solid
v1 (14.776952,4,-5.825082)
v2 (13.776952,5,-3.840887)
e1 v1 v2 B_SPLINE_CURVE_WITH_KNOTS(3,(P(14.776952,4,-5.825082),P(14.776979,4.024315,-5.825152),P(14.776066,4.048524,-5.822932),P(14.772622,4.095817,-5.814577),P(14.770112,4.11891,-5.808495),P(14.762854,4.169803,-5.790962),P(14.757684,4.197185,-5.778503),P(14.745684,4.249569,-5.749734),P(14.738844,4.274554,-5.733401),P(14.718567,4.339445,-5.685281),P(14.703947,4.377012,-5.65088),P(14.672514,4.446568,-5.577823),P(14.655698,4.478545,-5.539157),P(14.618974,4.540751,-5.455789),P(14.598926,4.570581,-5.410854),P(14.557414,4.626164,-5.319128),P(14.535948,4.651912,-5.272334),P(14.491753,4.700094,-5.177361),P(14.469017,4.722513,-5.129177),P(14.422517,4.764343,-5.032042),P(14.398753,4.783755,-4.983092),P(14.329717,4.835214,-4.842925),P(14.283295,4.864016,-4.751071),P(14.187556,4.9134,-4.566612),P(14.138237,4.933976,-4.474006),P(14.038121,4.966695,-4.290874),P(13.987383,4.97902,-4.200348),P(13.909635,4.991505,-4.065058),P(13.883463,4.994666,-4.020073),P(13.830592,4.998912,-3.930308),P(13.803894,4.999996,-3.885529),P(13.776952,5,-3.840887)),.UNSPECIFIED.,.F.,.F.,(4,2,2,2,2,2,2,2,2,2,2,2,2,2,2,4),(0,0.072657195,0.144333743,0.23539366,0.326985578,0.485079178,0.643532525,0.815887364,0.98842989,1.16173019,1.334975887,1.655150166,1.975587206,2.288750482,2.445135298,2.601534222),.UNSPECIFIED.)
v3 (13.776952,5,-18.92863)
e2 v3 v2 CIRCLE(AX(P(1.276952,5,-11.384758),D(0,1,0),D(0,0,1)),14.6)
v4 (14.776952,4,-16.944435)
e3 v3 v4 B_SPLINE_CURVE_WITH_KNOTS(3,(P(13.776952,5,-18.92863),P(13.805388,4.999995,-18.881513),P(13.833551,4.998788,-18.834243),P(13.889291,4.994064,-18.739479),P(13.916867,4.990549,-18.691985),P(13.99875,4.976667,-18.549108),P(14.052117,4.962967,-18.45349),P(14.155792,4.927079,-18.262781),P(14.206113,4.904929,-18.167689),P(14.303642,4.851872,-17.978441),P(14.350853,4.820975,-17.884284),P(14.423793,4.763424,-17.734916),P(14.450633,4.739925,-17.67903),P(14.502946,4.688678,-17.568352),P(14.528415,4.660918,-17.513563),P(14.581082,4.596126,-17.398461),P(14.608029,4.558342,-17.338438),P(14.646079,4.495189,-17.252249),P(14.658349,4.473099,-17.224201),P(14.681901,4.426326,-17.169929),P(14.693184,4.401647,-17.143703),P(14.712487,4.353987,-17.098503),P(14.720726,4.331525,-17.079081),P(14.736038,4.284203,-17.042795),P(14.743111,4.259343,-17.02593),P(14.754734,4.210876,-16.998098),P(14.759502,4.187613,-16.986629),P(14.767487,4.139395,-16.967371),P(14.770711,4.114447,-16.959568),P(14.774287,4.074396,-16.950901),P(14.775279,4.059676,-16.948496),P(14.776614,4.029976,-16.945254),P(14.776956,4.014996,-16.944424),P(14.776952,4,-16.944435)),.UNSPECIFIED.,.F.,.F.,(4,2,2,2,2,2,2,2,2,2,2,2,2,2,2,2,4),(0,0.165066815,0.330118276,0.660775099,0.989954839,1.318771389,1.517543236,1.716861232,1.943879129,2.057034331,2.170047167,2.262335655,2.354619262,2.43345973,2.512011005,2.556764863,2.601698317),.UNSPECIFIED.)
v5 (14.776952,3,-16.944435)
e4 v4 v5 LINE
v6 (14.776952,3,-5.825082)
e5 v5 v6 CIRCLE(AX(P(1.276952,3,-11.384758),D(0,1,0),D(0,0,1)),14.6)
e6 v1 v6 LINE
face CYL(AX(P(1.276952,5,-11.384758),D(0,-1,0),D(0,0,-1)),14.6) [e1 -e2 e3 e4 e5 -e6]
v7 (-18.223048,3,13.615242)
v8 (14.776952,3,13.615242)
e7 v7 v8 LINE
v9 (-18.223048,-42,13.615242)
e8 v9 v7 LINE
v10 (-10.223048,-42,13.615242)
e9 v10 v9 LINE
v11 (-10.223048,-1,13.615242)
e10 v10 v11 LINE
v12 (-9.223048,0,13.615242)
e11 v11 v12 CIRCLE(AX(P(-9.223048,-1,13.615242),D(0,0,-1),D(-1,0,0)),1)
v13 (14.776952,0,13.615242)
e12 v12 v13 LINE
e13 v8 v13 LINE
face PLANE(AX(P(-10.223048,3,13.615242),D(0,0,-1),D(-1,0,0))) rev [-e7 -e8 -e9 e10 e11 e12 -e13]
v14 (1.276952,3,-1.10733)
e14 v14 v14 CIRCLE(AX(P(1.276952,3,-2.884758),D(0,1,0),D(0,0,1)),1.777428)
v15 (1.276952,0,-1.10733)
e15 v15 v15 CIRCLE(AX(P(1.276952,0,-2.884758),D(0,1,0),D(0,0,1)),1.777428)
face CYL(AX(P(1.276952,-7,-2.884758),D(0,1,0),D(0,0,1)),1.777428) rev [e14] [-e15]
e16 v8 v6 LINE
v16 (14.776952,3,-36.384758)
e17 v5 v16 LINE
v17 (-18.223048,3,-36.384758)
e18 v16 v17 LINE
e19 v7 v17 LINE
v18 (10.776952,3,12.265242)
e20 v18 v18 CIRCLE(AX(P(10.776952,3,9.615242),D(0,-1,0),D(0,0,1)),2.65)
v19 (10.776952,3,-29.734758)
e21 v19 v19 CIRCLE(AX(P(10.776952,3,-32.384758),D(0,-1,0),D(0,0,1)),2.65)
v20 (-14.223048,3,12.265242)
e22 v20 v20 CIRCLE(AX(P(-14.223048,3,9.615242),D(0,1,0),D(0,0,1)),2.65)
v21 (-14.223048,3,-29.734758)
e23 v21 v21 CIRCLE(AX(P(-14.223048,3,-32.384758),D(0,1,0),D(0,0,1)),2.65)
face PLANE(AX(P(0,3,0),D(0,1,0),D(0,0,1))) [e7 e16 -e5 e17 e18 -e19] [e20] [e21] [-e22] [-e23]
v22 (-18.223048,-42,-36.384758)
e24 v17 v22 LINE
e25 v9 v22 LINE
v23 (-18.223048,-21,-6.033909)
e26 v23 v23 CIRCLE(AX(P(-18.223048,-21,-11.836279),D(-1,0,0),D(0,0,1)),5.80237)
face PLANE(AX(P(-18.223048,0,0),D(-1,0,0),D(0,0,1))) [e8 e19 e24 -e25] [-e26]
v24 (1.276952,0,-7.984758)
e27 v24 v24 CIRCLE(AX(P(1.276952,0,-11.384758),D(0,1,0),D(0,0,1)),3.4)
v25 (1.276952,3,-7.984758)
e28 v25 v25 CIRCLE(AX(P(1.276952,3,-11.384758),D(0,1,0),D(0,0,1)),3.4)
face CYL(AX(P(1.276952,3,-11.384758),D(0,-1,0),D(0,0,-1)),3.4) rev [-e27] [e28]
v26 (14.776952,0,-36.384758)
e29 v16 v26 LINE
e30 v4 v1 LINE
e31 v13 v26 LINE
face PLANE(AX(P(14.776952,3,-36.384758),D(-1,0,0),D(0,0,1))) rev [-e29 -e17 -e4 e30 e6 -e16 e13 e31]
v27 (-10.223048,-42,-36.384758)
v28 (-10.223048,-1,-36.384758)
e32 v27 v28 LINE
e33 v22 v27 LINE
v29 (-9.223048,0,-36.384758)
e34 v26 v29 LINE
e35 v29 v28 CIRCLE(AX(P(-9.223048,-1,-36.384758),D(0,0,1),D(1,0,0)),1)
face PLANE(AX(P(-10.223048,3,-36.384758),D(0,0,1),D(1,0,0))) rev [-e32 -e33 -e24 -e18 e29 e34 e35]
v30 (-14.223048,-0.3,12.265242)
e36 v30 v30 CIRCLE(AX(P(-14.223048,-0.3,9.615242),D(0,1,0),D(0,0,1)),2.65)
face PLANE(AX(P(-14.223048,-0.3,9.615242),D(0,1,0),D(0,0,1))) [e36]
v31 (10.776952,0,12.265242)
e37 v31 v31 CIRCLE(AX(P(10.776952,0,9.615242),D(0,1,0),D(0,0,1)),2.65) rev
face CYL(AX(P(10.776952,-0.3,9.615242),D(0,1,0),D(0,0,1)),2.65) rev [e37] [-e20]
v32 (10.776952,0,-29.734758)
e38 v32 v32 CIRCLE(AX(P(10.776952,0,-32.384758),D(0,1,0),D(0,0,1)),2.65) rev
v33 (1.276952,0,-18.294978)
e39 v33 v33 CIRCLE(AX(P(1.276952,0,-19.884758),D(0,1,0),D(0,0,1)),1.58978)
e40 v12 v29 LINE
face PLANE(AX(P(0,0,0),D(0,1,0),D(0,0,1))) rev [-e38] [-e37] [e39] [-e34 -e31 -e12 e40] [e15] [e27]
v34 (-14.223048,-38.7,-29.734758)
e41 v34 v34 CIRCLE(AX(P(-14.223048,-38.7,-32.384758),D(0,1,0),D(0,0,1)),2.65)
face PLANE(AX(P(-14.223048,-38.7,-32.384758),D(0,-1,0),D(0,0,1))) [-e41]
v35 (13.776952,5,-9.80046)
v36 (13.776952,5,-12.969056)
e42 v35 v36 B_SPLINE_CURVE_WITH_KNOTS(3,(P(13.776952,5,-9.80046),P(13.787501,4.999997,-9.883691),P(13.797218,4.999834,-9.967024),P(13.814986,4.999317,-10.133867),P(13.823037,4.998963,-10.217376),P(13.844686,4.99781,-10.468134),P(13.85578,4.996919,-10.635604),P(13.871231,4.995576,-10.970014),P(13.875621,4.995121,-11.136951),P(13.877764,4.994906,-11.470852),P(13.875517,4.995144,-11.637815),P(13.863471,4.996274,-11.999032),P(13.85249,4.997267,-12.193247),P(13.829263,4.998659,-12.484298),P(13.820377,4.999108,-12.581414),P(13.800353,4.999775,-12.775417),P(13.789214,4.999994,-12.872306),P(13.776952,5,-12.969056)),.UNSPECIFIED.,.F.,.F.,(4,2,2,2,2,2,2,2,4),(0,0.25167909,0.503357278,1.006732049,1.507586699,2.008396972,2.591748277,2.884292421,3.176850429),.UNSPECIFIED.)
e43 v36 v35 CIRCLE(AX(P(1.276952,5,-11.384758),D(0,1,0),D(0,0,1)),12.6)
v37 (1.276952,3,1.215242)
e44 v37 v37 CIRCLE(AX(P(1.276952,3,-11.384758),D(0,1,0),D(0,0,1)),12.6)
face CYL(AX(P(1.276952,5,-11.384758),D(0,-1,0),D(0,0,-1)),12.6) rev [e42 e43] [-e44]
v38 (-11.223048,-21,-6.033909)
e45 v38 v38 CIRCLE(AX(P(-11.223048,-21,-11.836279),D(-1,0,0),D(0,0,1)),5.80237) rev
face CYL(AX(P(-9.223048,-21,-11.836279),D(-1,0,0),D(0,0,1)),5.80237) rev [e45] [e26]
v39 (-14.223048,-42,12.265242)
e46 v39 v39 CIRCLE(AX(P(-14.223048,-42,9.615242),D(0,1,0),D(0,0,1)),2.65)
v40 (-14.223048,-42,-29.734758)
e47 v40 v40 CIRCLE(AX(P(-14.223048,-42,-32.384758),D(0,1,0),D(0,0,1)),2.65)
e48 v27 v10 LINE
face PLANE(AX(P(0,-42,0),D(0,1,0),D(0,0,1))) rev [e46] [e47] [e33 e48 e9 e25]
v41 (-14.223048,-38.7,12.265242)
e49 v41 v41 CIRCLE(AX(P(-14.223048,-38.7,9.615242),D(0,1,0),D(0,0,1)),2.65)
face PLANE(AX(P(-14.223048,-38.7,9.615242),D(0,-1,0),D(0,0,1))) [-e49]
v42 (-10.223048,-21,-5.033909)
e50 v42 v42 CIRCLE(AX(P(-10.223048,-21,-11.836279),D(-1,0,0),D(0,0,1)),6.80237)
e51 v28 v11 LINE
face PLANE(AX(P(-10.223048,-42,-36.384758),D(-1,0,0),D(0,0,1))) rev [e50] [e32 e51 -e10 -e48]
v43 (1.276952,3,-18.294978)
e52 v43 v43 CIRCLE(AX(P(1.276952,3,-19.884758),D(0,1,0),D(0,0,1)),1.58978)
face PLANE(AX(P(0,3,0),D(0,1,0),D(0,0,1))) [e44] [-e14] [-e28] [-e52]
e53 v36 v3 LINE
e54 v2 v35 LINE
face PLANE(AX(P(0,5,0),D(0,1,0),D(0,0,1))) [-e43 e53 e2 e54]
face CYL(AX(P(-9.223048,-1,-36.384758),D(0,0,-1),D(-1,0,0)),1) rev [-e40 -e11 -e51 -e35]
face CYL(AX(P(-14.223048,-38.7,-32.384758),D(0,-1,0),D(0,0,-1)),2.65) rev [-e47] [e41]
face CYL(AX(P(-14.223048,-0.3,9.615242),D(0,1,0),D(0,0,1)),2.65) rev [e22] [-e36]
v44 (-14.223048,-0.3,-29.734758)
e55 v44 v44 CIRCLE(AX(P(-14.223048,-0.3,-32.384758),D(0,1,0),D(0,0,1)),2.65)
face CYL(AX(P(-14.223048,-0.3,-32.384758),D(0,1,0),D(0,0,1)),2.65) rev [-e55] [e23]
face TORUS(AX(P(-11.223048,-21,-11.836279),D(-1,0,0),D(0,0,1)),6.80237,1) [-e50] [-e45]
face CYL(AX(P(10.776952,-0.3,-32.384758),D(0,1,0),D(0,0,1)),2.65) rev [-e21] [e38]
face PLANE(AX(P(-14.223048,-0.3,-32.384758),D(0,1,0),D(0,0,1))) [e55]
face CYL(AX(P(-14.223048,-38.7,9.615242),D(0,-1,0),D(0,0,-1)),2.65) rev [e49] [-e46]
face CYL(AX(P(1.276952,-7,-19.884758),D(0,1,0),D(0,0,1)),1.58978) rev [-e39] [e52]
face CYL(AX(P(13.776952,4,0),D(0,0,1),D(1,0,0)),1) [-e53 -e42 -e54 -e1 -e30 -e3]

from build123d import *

# Parameters (mm, degrees)
SKETCH1_W           = 25
SKETCH1_H           = 50
SKETCH1_R           = 3.4
BOSS_EXTRUDE1_DEPTH = 3
SKETCH2_W           = 50
SKETCH2_H           = 3
BOSS_EXTRUDE2_DEPTH = 8
SKETCH3_W           = 8
SKETCH3_H           = 50
BOSS_EXTRUDE3_DEPTH = 42
SKETCH4_R           = 2.65
CUT_EXTRUDE1_DEPTH  = 3.3
SKETCH5_R           = 5.802370205
CUT_EXTRUDE2_DEPTH  = 9
FILLET2_R           = 1
SKETCH6_R           = 12.6
BOSS_EXTRUDE4_DEPTH = 2
FILLET3_R           = 1
FILLET4_R           = 1
SKETCH8_R           = 1.589780168
SKETCH8_R_2         = 1.777428262
CUT_EXTRUDE3_DEPTH  = 10


with BuildPart() as part:
    # Sketch1 → Boss-Extrude1 (new body)
    with BuildSketch(Plane(origin=(0, 0, 0), x_dir=(1, 0, 0), z_dir=(0, 1, 0))):
        with Locations((2.276951673, 11.384758364)):
            Rectangle(SKETCH1_W, SKETCH1_H)
        with Locations(Location((1.276951673, 11.384758364, 0), (0, 0, 270))):
            Circle(SKETCH1_R, mode=Mode.SUBTRACT)
    extrude(amount=BOSS_EXTRUDE1_DEPTH)

    # Sketch2 → Boss-Extrude2 (add)
    with BuildSketch(Plane.ZY.offset(10.223048327)):
        with Locations((-11.384758364, 1.5)):
            Rectangle(SKETCH2_W, SKETCH2_H)
    extrude(amount=BOSS_EXTRUDE2_DEPTH)

    # Sketch3 → Boss-Extrude3 (add)
    with BuildSketch(Plane.XZ):
        with Locations((-14.223048327, -11.384758364)):
            Rectangle(SKETCH3_W, SKETCH3_H)
    extrude(amount=BOSS_EXTRUDE3_DEPTH)

    # Sketch4 → Cut-Extrude1 (cut)
    with BuildSketch(Plane(origin=(0, 3, 0), x_dir=(1, 0, 0), z_dir=(0, 1, 0))):
        with Locations(Location((-14.223048327, 32.384758364, 0), (0, 0, 270))):
            Circle(SKETCH4_R)
        with Locations(Location((-14.223048327, -9.615241636, 0), (0, 0, 270))):
            Circle(SKETCH4_R)
    cut_extrude1 = extrude(amount=-CUT_EXTRUDE1_DEPTH, mode=Mode.SUBTRACT)

    # Mirror1: Cut-Extrude1 across plane
    add(cut_extrude1.mirror(Plane.ZX.offset(-19.5)), mode=Mode.SUBTRACT)

    # Sketch5 → Cut-Extrude2 (cut)
    with BuildSketch(Plane.ZY.offset(18.223048327)):
        with Locations((-11.836279124, -21)):
            Circle(SKETCH5_R)
    extrude(amount=-CUT_EXTRUDE2_DEPTH, mode=Mode.SUBTRACT)

    # Fillet2
    fillet2_edges = [part.edges().sort_by_distance(p)[0] for p in [
        (-10.223048327, -21, -17.638649329),
    ]]
    fillet(fillet2_edges, radius=FILLET2_R)

    # Mirror2: Cut-Extrude1 across plane
    add(cut_extrude1.mirror(Plane.ZY.offset(1.723048327)), mode=Mode.SUBTRACT)

    # Sketch6 → Boss-Extrude4 (add)
    with BuildSketch(Plane(origin=(0, 3, 0), x_dir=(1, 0, 0), z_dir=(0, 1, 0))):
        with BuildLine():
            Line((14.776951673, 5.825082115), (14.776951673, 16.944434614))
            ThreePointArc((14.776951673, 16.944434614), (-13.323048327, 11.384758364), (14.776951673, 5.825082115))
        make_face()
        with Locations(Location((1.276951673, 11.384758364, 0), (0, 0, 270))):
            Circle(SKETCH6_R, mode=Mode.SUBTRACT)
    extrude(amount=BOSS_EXTRUDE4_DEPTH)

    # Fillet3
    fillet3_edges = [part.edges().sort_by_distance(p)[0] for p in [
        (-10.223048327, 0, -11.384758364),
    ]]
    fillet(fillet3_edges, radius=FILLET3_R)

    # Fillet4
    # the kernel refuses this fillet: 1 mm, written as the material it takes off along each edge
    with BuildSketch(Plane(origin=(14.776951673, 5, -3.325082115), x_dir=(0, -1, 0), z_dir=(0, 0, -1))) as fillet4_piece_1:
        with BuildLine():
            CenterArc((FILLET4_R, FILLET4_R), FILLET4_R, 180, 90)
            Line((0, FILLET4_R), (0, 0))
            Line((0, 0), (FILLET4_R, 0))
        make_face()
    extrude(amount=16.119352499, mode=Mode.SUBTRACT)

    # Sketch8 → Cut-Extrude3 (cut)
    with BuildSketch(Plane(origin=(0, 3, 0), x_dir=(1, 0, 0), z_dir=(0, 1, 0))):
        with Locations(Location((1.276951673, 19.884758364, 0), (0, 0, 270))):
            Circle(SKETCH8_R)
        with Locations(Location((1.276951673, 2.884758364, 0), (0, 0, 270))):
            Circle(SKETCH8_R_2)
    extrude(amount=-CUT_EXTRUDE3_DEPTH, mode=Mode.SUBTRACT)


solid = part.part
